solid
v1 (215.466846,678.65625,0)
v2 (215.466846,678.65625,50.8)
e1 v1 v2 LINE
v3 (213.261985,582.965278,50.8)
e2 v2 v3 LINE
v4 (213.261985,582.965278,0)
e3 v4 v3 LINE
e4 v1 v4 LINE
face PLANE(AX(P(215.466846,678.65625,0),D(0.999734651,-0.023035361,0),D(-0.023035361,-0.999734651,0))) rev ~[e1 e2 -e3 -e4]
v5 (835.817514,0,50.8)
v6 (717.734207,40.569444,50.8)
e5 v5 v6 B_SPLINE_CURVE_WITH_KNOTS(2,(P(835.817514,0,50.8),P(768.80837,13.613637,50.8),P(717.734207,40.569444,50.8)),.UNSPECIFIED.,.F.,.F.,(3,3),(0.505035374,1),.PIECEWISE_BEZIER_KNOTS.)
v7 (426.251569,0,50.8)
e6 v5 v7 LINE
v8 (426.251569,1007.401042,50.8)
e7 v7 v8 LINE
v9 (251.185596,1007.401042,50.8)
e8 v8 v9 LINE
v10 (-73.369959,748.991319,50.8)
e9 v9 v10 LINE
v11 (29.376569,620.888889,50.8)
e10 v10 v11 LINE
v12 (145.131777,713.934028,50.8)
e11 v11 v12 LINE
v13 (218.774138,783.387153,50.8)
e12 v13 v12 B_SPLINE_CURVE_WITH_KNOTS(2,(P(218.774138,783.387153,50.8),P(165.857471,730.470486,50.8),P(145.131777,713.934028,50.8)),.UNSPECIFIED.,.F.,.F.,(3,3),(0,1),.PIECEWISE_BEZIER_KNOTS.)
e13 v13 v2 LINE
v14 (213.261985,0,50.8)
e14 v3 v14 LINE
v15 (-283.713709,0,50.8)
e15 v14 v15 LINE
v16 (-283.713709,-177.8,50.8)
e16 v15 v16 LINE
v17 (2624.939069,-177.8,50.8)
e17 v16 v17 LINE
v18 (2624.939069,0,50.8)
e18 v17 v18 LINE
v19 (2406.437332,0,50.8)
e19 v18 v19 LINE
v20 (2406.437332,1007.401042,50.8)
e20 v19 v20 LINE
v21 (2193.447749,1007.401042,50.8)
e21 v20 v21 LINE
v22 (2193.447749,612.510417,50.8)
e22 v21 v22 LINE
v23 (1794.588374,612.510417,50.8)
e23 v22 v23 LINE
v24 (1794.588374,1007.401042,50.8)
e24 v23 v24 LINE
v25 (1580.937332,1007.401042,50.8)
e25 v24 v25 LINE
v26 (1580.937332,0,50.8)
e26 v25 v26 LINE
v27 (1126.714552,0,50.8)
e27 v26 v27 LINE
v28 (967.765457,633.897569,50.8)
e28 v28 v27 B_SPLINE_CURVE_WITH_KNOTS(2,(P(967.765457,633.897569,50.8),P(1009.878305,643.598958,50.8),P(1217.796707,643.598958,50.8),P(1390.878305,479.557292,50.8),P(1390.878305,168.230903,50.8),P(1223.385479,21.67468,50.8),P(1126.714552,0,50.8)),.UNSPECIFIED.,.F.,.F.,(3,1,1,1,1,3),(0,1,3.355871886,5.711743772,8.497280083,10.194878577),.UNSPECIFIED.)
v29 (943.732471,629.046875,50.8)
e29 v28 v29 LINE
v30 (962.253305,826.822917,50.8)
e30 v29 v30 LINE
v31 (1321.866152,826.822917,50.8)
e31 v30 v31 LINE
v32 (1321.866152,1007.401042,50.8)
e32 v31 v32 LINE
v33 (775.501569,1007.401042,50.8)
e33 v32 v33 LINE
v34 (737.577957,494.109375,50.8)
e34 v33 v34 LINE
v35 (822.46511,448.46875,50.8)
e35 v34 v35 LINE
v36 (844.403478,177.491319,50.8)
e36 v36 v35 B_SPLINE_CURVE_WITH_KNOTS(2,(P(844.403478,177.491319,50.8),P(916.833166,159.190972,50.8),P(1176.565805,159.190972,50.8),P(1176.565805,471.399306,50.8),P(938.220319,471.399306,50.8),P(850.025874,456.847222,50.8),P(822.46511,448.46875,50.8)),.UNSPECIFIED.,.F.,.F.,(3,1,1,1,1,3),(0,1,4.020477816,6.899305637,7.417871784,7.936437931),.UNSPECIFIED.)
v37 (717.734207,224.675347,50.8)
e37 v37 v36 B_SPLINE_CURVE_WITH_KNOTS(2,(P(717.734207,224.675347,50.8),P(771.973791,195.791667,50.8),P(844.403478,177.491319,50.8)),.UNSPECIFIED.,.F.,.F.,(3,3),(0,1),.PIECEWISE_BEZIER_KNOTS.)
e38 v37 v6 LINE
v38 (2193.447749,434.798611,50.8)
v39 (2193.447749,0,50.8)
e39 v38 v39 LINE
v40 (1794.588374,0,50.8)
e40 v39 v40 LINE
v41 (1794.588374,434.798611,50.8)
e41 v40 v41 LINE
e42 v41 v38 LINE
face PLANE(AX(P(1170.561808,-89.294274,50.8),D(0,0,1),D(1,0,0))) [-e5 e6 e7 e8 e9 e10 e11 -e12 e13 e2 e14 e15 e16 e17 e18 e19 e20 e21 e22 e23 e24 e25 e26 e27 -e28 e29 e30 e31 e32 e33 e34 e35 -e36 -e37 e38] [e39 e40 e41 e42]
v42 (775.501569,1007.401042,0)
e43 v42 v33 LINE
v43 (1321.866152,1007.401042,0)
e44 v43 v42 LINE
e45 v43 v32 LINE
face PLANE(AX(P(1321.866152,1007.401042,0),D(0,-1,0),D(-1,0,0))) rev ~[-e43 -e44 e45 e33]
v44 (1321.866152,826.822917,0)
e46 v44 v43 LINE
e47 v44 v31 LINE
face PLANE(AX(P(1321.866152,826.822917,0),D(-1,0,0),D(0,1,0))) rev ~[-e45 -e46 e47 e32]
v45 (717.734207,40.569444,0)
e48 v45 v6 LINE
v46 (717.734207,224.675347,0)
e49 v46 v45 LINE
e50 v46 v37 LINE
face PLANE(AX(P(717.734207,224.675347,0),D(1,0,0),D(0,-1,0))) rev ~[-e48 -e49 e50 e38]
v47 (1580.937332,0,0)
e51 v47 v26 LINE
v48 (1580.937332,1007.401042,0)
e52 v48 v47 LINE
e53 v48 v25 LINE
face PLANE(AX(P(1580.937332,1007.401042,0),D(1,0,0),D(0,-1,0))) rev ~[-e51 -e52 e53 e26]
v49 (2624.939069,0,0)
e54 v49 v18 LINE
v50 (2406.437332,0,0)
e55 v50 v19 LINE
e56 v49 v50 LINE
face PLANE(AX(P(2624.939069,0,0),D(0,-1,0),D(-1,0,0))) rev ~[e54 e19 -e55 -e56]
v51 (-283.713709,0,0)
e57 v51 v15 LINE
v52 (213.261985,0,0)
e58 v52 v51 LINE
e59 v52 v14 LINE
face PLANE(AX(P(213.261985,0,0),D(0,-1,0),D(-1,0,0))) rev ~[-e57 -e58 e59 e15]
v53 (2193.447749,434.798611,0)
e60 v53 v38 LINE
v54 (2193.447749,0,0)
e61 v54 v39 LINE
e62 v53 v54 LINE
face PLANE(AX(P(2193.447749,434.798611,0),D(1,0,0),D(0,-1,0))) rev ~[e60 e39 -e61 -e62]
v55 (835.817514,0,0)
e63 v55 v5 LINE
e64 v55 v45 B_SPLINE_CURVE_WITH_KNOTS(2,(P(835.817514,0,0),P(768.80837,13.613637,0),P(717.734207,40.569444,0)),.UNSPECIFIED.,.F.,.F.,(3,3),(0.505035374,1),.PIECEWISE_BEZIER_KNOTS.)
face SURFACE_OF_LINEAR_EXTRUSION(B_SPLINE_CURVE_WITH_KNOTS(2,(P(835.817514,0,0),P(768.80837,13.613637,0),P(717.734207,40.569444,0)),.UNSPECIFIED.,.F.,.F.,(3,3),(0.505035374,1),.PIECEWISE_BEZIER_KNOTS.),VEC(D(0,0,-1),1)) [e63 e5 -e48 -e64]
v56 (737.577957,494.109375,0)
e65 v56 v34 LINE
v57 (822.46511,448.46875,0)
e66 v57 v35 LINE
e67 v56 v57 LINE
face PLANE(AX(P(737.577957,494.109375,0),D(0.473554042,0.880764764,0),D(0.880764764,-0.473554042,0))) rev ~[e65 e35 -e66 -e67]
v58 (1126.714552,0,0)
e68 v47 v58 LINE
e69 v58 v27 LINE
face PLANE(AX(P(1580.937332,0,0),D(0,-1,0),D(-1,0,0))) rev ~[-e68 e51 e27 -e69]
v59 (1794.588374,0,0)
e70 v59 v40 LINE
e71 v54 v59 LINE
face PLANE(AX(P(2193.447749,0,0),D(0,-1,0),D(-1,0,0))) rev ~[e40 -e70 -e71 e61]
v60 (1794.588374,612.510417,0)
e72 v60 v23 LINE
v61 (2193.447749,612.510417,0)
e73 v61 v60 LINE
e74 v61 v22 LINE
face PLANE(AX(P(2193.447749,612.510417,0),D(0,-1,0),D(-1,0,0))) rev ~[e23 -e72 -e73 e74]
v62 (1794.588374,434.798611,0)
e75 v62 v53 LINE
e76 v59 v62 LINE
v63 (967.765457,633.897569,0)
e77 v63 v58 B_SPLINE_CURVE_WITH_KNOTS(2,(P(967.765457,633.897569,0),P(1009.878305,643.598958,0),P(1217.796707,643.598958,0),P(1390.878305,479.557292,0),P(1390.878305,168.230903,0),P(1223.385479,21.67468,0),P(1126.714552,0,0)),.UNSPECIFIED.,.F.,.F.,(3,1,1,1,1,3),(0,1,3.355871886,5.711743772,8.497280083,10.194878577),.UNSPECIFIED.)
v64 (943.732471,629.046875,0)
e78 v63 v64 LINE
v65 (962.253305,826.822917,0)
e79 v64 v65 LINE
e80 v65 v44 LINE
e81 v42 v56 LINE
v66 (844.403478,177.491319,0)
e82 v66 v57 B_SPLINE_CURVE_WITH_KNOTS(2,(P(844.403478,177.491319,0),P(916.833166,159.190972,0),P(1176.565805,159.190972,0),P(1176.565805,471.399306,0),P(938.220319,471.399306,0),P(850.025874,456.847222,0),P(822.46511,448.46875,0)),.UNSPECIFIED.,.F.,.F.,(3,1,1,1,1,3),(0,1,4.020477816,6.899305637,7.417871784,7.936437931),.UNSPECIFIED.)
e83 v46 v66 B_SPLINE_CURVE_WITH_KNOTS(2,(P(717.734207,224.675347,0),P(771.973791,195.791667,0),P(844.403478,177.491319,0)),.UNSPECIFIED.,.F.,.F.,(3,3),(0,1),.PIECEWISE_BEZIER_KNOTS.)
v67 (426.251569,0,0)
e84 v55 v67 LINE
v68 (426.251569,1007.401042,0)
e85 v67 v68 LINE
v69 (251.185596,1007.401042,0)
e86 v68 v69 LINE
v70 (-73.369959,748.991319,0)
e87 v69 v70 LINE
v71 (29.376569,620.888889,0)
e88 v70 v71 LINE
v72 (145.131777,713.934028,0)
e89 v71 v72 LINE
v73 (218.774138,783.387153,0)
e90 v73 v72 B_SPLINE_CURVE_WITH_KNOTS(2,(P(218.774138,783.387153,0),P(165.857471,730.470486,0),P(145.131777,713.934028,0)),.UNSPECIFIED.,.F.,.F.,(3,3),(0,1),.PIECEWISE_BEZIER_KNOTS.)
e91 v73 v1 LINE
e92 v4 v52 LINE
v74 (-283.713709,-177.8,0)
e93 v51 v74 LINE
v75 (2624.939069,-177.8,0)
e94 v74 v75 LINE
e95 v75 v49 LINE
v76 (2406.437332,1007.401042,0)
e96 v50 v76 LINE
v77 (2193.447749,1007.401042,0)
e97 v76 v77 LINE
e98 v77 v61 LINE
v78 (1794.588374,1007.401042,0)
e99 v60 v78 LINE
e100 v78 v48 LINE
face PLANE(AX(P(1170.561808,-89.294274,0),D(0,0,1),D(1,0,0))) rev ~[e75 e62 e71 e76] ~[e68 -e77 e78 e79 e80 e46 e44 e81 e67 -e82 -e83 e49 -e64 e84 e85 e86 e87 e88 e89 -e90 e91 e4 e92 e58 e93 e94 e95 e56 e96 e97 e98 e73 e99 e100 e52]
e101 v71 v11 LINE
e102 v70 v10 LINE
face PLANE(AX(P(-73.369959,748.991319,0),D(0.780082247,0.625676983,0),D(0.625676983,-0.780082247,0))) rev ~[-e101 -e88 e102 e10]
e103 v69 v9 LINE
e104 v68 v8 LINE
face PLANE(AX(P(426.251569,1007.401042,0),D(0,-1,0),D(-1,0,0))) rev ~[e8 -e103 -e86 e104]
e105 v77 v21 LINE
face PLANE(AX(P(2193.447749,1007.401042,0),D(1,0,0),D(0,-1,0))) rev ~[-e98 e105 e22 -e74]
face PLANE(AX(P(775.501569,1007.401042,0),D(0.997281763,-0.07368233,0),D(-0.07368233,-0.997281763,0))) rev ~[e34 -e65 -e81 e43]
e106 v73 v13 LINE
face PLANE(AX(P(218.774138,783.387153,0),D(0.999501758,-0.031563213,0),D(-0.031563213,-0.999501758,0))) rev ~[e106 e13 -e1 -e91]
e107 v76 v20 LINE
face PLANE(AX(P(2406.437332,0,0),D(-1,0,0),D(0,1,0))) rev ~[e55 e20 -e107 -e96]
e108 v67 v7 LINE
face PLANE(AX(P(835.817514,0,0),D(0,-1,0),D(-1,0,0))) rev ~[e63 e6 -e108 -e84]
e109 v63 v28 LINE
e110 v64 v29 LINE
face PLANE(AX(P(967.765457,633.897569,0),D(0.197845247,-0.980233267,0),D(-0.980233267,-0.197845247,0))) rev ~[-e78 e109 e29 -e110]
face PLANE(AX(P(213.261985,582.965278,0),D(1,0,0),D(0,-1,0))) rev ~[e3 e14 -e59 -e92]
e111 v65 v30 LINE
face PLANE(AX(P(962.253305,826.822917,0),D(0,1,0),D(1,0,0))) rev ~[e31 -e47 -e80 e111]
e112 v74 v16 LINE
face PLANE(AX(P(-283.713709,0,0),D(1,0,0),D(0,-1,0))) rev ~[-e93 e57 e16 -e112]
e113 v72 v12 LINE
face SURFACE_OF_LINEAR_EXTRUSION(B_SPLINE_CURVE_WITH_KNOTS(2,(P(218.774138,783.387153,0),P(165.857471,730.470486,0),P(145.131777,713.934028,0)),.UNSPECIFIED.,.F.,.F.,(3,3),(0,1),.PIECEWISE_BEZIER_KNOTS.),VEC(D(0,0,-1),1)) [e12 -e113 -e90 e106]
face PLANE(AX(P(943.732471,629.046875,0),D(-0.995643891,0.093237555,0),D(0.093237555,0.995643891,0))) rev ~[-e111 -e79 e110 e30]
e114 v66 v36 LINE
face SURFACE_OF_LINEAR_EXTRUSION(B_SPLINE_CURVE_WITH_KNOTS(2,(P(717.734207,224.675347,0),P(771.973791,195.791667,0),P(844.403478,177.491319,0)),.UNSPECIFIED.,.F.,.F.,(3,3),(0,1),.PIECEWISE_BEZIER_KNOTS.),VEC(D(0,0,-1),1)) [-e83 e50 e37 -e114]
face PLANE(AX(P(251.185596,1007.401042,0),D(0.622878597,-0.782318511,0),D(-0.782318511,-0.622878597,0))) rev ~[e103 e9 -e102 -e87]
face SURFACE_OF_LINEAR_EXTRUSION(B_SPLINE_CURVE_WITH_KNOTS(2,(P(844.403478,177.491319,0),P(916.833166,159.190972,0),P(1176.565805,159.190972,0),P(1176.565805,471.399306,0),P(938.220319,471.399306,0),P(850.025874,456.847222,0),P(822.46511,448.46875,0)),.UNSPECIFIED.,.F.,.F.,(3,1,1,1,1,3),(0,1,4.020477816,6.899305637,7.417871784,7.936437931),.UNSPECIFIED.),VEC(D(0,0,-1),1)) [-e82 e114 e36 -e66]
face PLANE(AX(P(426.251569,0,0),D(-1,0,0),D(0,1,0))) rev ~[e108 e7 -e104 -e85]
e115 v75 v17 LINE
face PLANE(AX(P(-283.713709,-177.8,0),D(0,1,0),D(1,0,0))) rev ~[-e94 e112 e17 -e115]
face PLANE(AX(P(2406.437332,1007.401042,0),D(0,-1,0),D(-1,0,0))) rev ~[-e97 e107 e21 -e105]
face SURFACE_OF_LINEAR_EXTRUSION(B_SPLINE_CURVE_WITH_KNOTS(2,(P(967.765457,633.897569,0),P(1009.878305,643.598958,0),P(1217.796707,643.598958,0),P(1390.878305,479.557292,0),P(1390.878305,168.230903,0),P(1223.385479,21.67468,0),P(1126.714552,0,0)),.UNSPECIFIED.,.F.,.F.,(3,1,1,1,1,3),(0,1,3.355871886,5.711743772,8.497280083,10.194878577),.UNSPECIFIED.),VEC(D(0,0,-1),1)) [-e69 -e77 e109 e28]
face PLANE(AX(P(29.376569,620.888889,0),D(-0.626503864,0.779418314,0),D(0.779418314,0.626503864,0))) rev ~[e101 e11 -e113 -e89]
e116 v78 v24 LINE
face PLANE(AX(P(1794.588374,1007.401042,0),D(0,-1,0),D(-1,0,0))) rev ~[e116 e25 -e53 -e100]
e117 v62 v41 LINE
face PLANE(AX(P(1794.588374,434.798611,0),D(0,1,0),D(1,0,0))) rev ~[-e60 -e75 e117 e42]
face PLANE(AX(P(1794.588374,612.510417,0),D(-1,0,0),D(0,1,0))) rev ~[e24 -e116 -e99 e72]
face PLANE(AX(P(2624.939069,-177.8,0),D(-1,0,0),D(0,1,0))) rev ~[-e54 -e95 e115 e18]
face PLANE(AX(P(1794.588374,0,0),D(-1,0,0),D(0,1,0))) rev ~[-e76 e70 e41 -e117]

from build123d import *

# Parameters (mm, degrees)
F1_DEPTH = 50.8


# Not quite as in the source:
# - a feature names something its author has since deleted; it is built from what else it names


with BuildPart() as f1:
    # F0 (on Top) → F1 (new body)
    with BuildSketch(Plane.XY):
        with BuildLine():
            Line((-283.7137092352, 0), (-283.7137092352, -177.8))
            Line((-283.7137092352, -177.8), (2624.9390685426, -177.8))
            Line((2624.9390685426, -177.8), (2624.9390685426, 0))
            Line((2624.9390685426, 0), (2406.4373324315, 0))
            Line((2406.4373324315, 0), (2193.4477490981, 0))
            Line((2193.4477490981, 0), (1794.5883740981, 0))
            Line((1794.5883740981, 0), (1580.9373324315, 0))
            Line((1580.9373324315, 0), (1126.7145519045, 0))
            add(Edge.make_bspline(
                [(1126.7145519045, 0), (1064.7611763958, -13.890625), (989.1526102093, -13.890625)],
                knots=[0.6094332671, 0.6094332671, 0.6094332671, 1, 1, 1], degree=2))
            add(Edge.make_bspline(
                [(989.1526102093, -13.890625), (904.1900533476, -13.890625), (835.8175141984, 0)],
                knots=[0, 0, 0, 0.5050353738, 0.5050353738, 0.5050353738], degree=2))
            Line((835.8175141984, 0), (426.2515685426, 0))
            Line((426.2515685426, 0), (213.2619852093, 0))
            Line((213.2619852093, 0), (-283.7137092352, 0))
        make_face()
        with BuildLine():
            add(Edge.make_bspline(
                [(835.8175141984, 0), (768.808369802, 13.6136365267), (717.7342074315, 40.5694444444)],
                knots=[0.5050353738, 0.5050353738, 0.5050353738, 1, 1, 1], degree=2))
            Line((835.8175141984, 0), (1126.7145519045, 0))
            add(Edge.make_bspline(
                [(1286.8088602093, 77.1701388889), (1223.3854786806, 21.6746800513), (1126.7145519045, 0)],
                knots=[0, 0, 0, 0.6094332671, 0.6094332671, 0.6094332671], degree=2))
            add(Edge.make_bspline(
                [(1390.8783046537, 336.9027777778), (1390.8783046537, 168.2309027778), (1286.8088602093, 77.1701388889)],
                knots=[0, 0, 0, 1, 1, 1], degree=2))
            add(Edge.make_bspline(
                [(1304.3375060426, 561.578125), (1390.8783046537, 479.5572916667), (1390.8783046537, 336.9027777778)],
                knots=[0, 0, 0, 1, 1, 1], degree=2))
            add(Edge.make_bspline(
                [(1071.8349018759, 643.5989583333), (1217.7967074315, 643.5989583333), (1304.3375060426, 561.578125)],
                knots=[0, 0, 0, 1, 1, 1], degree=2))
            add(Edge.make_bspline(
                [(967.7654574315, 633.8975694444), (1009.8783046537, 643.5989583333), (1071.8349018759, 643.5989583333)],
                knots=[0, 0, 0, 1, 1, 1], degree=2))
            Line((967.7654574315, 633.8975694444), (943.7324713204, 629.046875))
            Line((943.7324713204, 629.046875), (962.2533046537, 826.8229166667))
            Line((962.2533046537, 826.8229166667), (1321.8661518759, 826.8229166667))
            Line((1321.8661518759, 826.8229166667), (1321.8661518759, 1007.4010416667))
            Line((1321.8661518759, 1007.4010416667), (775.5015685426, 1007.4010416667))
            Line((775.5015685426, 1007.4010416667), (737.5779574315, 494.109375))
            Line((737.5779574315, 494.109375), (822.4651102093, 448.46875))
            add(Edge.make_bspline(
                [(894.1230963204, 464.1232638889), (850.0258740981, 456.8472222222), (822.4651102093, 448.46875)],
                knots=[0, 0, 0, 1, 1, 1], degree=2))
            add(Edge.make_bspline(
                [(974.6005268759, 471.3993055556), (938.2203185426, 471.3993055556), (894.1230963204, 464.1232638889)],
                knots=[0, 0, 0, 1, 1, 1], degree=2))
            add(Edge.make_bspline(
                [(1176.5658046537, 319.0434027778), (1176.5658046537, 471.3993055556), (974.6005268759, 471.3993055556)],
                knots=[0, 0, 0, 1, 1, 1], degree=2))
            add(Edge.make_bspline(
                [(981.4355963204, 159.1909722222), (1176.5658046537, 159.1909722222), (1176.5658046537, 319.0434027778)],
                knots=[0, 0, 0, 1, 1, 1], degree=2))
            add(Edge.make_bspline(
                [(844.4034782648, 177.4913194444), (916.8331657648, 159.1909722222), (981.4355963204, 159.1909722222)],
                knots=[0, 0, 0, 1, 1, 1], degree=2))
            add(Edge.make_bspline(
                [(717.7342074315, 224.6753472222), (771.9737907648, 195.7916666667), (844.4034782648, 177.4913194444)],
                knots=[0, 0, 0, 1, 1, 1], degree=2))
            Line((717.7342074315, 224.6753472222), (717.7342074315, 40.5694444444))
        make_face()
        Polygon((2193.4477490981, 0), (2406.4373324315, 0), (2406.4373324315, 1007.4010416667), (2193.4477490981, 1007.4010416667), (2193.4477490981, 612.5104166667), (1794.5883740981, 612.5104166667), (1794.5883740981, 1007.4010416667), (1580.9373324315, 1007.4010416667), (1580.9373324315, 0), (1794.5883740981, 0), (1794.5883740981, 434.7986111111), (2193.4477490981, 434.7986111111), align=None)
        with BuildLine():
            Line((213.2619852093, 582.9652777778), (213.2619852093, 0))
            Line((213.2619852093, 0), (426.2515685426, 0))
            Line((426.2515685426, 0), (426.2515685426, 1007.4010416667))
            Line((426.2515685426, 1007.4010416667), (251.1855963204, 1007.4010416667))
            Line((251.1855963204, 1007.4010416667), (-73.3699592352, 748.9913194444))
            Line((-73.3699592352, 748.9913194444), (29.3765685426, 620.8888888889))
            Line((29.3765685426, 620.8888888889), (145.1317768759, 713.9340277778))
            add(Edge.make_bspline(
                [(218.774137987, 783.3871527778), (165.8574713204, 730.4704861111), (145.1317768759, 713.9340277778)],
                knots=[0, 0, 0, 1, 1, 1], degree=2))
            Line((218.774137987, 783.3871527778), (215.4668463204, 678.65625))
            Line((215.4668463204, 678.65625), (213.2619852093, 582.9652777778))
        make_face()
        with BuildLine():
            Line((1126.7145519045, 0), (835.8175141984, 0))
            add(Edge.make_bspline(
                [(989.1526102093, -13.890625), (904.1900533476, -13.890625), (835.8175141984, 0)],
                knots=[0, 0, 0, 0.5050353738, 0.5050353738, 0.5050353738], degree=2))
            add(Edge.make_bspline(
                [(1126.7145519045, 0), (1064.7611763958, -13.890625), (989.1526102093, -13.890625)],
                knots=[0.6094332671, 0.6094332671, 0.6094332671, 1, 1, 1], degree=2))
        make_face()
    extrude(amount=F1_DEPTH)


solid = f1.part
